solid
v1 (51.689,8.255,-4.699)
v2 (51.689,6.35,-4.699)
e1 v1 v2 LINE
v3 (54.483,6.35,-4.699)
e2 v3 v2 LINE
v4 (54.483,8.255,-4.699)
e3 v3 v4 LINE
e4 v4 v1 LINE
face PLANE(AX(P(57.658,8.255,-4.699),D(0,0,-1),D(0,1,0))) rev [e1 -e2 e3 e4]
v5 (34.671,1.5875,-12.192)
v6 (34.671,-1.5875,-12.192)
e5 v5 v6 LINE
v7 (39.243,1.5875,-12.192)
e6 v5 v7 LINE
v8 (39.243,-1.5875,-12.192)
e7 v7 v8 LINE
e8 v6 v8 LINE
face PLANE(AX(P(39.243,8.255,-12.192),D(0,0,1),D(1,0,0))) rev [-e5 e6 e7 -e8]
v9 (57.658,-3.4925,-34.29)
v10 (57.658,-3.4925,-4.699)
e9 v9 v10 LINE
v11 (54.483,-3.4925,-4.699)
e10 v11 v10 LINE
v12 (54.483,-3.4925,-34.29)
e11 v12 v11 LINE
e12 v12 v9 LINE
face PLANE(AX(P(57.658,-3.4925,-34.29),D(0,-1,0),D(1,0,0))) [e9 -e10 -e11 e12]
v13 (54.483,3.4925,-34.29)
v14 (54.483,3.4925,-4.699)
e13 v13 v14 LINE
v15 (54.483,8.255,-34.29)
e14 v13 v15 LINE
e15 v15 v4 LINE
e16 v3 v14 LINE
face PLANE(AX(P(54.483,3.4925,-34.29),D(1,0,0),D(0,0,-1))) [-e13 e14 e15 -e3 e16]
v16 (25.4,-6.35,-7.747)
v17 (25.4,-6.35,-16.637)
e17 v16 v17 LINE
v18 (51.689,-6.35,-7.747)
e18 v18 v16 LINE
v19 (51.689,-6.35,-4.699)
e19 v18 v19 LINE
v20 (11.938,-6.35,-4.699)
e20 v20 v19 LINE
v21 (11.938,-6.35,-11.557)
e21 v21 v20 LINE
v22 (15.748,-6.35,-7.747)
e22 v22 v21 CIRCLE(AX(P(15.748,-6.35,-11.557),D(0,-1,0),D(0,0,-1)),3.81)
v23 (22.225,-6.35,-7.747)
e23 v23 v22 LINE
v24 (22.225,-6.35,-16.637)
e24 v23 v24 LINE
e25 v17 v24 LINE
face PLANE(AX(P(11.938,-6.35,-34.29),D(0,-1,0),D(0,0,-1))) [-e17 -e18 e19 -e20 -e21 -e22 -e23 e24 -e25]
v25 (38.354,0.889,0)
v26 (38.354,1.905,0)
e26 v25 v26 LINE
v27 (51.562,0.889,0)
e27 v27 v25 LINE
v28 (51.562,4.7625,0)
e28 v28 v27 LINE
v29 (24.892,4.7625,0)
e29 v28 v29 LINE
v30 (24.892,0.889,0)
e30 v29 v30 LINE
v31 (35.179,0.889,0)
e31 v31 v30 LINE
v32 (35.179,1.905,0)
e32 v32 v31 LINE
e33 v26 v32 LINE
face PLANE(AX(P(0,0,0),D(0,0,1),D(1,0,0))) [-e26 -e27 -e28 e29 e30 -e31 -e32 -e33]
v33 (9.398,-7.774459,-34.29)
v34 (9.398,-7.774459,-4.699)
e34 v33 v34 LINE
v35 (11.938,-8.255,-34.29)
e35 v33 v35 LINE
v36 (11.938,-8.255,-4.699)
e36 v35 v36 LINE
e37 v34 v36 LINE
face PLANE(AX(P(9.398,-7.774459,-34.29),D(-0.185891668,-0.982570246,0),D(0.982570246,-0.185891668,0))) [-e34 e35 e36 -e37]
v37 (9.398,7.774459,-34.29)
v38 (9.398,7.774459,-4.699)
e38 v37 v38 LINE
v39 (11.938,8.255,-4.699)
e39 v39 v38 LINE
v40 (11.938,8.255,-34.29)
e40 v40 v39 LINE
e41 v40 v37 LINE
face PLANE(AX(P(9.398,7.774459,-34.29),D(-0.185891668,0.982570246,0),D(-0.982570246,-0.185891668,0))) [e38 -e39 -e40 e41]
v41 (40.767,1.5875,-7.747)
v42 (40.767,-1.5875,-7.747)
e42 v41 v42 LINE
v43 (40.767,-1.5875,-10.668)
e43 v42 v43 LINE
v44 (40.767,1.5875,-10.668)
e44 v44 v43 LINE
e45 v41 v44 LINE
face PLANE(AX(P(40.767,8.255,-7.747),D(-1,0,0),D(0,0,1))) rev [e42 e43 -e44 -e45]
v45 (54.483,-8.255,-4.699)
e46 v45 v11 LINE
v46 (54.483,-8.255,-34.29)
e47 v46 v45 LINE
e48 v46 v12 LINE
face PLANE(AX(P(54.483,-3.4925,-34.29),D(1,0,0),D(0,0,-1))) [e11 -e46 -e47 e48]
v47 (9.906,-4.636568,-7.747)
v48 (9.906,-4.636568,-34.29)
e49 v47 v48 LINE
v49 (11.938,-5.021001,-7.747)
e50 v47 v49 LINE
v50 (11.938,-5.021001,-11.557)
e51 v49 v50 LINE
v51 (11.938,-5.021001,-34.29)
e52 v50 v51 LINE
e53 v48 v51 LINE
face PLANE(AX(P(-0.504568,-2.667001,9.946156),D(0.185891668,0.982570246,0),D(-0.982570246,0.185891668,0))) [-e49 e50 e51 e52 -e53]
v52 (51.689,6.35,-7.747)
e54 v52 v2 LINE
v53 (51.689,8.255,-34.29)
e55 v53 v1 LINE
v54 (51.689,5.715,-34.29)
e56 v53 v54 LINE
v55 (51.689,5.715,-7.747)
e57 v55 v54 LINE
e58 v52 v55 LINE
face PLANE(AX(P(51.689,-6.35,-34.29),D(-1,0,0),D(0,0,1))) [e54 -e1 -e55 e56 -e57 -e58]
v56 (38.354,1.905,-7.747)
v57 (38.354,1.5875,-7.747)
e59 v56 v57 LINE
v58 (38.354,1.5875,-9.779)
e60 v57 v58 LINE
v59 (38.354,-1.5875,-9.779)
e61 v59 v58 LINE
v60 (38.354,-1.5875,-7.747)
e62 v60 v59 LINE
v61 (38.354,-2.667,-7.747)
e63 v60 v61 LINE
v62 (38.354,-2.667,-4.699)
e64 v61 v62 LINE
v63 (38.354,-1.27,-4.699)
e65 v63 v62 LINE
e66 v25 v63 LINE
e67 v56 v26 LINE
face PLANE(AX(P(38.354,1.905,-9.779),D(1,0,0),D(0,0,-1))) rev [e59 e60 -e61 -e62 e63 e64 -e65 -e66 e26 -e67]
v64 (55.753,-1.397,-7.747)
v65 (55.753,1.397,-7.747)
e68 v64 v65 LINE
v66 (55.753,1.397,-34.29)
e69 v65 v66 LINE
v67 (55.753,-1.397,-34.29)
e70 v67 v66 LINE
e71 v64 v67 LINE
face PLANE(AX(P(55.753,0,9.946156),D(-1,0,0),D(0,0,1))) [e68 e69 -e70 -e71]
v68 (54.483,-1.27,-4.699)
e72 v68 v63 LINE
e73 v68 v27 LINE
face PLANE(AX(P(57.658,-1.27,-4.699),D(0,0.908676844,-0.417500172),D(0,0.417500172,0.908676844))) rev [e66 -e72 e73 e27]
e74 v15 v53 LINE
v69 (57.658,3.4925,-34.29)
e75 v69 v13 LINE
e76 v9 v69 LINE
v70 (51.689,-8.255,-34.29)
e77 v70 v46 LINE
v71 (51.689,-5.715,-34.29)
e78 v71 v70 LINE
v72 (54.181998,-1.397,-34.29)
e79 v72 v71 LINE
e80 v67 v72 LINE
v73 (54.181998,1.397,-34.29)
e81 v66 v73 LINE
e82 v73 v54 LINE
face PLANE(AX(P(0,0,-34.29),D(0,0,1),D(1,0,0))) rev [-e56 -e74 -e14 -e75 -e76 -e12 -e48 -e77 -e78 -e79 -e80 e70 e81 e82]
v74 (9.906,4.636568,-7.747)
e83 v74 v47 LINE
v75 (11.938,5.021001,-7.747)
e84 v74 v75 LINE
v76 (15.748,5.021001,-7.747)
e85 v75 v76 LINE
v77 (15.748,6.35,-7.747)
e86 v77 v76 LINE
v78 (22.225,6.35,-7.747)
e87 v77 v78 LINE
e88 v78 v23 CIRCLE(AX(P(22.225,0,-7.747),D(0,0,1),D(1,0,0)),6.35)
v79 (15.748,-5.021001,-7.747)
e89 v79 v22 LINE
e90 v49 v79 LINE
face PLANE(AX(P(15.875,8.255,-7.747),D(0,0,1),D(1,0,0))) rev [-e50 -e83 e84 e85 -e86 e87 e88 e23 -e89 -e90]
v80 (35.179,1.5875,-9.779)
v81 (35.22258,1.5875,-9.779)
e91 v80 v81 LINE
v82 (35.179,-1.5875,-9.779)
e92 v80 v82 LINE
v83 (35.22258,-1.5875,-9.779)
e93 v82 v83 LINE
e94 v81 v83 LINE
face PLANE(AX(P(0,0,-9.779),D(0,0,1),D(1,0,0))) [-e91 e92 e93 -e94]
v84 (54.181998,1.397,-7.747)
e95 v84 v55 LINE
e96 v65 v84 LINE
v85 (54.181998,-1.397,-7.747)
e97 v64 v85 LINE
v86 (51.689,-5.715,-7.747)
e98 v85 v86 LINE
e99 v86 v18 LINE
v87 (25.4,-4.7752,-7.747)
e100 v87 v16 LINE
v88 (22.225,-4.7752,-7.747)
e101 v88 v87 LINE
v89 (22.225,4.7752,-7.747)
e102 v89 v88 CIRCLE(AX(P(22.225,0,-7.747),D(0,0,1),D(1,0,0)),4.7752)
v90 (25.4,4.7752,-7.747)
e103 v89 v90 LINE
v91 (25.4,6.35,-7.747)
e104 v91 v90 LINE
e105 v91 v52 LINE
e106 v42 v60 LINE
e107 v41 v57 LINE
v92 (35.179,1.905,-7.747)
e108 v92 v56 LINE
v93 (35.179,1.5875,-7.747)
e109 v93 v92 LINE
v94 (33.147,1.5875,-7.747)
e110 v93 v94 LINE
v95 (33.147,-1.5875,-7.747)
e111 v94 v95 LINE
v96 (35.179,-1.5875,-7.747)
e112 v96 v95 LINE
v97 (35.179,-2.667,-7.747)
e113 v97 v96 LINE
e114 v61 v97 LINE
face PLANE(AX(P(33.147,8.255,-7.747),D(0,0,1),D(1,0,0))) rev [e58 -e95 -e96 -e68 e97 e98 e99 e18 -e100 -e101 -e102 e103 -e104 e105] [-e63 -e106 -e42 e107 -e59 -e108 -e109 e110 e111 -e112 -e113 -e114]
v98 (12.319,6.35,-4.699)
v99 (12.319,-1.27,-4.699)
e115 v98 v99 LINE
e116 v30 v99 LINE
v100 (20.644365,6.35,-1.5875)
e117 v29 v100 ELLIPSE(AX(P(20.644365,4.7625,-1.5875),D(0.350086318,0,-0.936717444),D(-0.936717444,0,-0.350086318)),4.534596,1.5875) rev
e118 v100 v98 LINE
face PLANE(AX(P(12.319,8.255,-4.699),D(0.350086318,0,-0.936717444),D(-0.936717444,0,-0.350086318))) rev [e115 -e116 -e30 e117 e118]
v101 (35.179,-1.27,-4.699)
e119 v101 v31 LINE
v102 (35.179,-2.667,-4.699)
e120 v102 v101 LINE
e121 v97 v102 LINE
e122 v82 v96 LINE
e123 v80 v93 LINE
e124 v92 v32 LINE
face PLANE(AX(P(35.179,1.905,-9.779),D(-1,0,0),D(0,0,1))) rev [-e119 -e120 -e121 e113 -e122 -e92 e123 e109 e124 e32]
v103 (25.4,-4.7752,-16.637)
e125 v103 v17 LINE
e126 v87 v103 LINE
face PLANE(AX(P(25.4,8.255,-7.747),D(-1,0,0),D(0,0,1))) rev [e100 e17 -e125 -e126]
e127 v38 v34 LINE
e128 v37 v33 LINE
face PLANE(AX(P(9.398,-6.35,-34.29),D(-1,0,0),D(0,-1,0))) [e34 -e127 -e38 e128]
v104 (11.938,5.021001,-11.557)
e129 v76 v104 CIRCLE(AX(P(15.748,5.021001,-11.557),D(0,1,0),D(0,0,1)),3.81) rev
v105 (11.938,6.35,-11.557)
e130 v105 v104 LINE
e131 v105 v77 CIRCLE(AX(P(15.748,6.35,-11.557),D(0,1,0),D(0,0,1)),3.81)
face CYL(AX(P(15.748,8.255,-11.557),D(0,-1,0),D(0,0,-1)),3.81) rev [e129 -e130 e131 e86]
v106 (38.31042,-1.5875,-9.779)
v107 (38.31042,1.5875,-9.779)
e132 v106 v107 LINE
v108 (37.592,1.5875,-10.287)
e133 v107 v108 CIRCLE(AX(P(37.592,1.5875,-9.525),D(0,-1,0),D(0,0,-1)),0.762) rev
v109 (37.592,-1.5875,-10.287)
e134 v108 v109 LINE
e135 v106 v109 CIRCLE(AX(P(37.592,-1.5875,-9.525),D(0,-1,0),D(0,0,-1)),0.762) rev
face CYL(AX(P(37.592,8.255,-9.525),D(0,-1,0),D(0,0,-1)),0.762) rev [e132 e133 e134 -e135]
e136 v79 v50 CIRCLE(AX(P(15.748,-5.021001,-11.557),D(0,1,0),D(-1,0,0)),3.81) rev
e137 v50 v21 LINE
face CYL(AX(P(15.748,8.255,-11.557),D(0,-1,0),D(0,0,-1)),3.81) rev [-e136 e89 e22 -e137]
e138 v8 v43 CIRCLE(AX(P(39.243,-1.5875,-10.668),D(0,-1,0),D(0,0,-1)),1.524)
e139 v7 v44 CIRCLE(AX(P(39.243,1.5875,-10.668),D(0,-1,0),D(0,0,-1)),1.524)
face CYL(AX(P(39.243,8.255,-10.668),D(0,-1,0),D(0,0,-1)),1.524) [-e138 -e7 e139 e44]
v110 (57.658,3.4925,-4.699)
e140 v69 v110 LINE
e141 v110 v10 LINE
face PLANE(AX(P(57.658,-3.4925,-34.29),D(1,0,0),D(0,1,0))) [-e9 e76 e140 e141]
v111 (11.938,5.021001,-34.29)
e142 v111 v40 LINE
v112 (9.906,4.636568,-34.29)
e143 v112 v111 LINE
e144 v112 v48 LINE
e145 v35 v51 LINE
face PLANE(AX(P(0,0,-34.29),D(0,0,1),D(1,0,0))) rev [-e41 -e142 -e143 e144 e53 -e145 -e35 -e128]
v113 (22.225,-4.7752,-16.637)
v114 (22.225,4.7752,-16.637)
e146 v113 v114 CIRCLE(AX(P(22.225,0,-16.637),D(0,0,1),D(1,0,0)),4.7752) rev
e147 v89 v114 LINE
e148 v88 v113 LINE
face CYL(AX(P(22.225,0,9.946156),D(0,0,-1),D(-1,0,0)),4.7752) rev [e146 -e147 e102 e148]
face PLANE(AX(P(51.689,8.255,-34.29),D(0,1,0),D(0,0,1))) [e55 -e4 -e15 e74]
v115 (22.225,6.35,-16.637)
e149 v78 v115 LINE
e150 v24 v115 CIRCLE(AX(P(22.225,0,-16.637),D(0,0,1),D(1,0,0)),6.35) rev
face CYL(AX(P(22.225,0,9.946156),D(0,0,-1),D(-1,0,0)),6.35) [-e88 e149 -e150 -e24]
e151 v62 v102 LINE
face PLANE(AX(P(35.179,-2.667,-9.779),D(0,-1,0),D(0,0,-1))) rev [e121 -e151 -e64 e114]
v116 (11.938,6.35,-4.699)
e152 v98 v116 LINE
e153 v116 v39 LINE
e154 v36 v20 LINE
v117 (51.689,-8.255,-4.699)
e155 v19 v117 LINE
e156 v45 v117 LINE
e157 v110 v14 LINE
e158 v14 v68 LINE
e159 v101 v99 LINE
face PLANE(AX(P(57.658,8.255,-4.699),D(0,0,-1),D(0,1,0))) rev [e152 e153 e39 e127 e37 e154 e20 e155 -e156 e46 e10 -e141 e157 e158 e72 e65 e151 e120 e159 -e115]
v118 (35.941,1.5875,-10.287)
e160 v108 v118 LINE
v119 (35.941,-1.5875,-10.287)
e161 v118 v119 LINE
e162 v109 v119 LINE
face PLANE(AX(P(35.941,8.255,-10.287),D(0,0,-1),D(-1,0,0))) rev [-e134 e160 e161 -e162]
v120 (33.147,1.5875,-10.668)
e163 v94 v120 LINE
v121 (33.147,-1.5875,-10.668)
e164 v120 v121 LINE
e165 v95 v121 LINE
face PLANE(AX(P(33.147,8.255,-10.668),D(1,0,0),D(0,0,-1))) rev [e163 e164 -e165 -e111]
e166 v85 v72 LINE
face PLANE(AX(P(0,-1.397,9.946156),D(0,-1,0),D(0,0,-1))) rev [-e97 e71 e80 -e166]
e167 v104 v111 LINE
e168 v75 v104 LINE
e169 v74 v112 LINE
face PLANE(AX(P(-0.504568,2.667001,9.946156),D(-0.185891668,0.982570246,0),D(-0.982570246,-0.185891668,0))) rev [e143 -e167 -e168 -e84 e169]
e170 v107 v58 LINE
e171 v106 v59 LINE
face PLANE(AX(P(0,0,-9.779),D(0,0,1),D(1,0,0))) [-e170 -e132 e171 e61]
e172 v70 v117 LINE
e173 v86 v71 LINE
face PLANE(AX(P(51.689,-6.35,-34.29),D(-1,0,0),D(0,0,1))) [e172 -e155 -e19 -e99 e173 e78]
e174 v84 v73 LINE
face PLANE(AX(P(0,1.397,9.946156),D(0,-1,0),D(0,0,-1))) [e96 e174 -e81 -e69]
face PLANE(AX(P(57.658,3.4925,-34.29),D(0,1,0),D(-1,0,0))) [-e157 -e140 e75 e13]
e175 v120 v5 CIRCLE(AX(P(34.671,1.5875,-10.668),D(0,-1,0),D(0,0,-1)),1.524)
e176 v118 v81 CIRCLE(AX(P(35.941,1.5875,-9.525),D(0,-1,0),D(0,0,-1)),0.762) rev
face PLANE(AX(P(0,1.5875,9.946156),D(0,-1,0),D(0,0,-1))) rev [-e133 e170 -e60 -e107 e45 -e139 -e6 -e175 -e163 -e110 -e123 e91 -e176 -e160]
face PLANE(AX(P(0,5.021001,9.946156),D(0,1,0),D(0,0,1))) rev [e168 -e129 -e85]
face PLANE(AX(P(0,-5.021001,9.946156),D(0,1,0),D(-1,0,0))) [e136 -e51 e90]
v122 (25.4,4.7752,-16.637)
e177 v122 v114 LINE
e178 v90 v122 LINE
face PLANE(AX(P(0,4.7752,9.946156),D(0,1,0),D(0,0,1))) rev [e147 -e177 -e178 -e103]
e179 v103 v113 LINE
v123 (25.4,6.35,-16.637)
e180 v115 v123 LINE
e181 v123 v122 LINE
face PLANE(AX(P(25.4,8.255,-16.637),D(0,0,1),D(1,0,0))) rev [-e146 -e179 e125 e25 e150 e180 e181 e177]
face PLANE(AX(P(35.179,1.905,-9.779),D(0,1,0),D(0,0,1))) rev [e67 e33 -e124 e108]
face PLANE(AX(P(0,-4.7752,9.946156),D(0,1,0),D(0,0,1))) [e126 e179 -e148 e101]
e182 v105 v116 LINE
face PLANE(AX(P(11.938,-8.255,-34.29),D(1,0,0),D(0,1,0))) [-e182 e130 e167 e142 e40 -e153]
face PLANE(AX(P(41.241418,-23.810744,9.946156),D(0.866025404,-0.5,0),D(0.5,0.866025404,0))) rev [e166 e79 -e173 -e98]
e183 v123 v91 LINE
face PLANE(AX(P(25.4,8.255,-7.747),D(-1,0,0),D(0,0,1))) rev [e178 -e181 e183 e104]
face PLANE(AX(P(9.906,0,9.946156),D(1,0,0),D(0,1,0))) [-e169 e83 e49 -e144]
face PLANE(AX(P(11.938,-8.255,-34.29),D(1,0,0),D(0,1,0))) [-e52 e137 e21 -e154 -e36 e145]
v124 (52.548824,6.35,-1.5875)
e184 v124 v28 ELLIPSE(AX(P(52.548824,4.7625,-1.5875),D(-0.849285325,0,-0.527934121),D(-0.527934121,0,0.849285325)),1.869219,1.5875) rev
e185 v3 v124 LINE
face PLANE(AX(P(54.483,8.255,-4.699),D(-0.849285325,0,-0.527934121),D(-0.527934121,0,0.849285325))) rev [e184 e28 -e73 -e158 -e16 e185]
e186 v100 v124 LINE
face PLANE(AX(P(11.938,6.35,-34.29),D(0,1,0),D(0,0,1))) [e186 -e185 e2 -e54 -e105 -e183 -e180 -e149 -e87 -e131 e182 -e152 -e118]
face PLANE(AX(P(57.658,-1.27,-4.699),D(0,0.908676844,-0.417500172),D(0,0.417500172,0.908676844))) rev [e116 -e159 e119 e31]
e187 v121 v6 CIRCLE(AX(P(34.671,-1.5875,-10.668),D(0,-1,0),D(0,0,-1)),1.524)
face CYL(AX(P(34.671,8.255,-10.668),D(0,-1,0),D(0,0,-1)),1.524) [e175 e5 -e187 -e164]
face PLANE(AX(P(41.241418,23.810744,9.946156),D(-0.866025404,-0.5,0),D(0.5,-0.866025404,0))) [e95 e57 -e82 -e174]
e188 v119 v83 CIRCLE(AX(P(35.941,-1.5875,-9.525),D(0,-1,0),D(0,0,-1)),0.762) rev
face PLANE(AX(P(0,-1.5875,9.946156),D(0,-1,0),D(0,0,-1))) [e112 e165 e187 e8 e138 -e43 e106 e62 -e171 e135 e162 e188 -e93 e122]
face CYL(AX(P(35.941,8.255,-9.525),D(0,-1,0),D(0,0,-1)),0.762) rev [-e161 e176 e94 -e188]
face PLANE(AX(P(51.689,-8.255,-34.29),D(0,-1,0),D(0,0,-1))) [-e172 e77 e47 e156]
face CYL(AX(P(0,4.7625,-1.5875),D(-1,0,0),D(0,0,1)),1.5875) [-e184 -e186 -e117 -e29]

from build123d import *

# Parameters (mm, degrees)
BOSS_EXTRUDE1_DEPTH    = 34.29
SKETCH2_W              = 4.699
SKETCH2_H              = 1.905
CUT_EXTRUDE1_DEPTH     = 60.774381845
SKETCH3_W              = 3.175
SKETCH3_H              = 4.572
CUT_EXTRUDE2_DEPTH     = 9.779
CUT_EXTRUDE3_DEPTH     = 70.085665402
CUT_EXTRUDE4_START     = -26.543
CUT_EXTRUDE4_OUTLINE_W = 7.62
CUT_EXTRUDE4_OUTLINE_H = 4.7625
CUT_EXTRUDE4_DEPTH     = 26.543
FILLET4_R              = 1.5875


# Read off the part's stored shape, not the designer's step: Cut-Extrude4
with BuildPart() as part:
    # Sketch1 → Boss-Extrude1 (new body)
    with BuildSketch(Plane.XY):
        Polygon((9.398, 6.35), (9.398, -6.35), (9.398, -7.774459459), (11.938, -8.255), (11.938, -6.35), (51.689, -6.35), (51.689, -8.255), (54.483, -8.255), (54.483, -3.4925), (57.658, -3.4925), (57.658, 3.4925), (54.483, 3.4925), (54.483, 8.255), (51.689, 8.255), (51.689, 6.35), (11.938, 6.35), (11.938, 8.255), (9.398, 7.774459459), align=None)
    extrude(amount=-BOSS_EXTRUDE1_DEPTH)

    # Sketch2 → Cut-Extrude1 (cut, through all)
    with BuildSketch(Plane.ZY.offset(-9.398)):
        with Locations((-2.3495, 7.3025)):
            Rectangle(SKETCH2_W, SKETCH2_H)
        Polygon((-4.699, -8.255), (-4.699, -1.27), (0, 0.889), (0, -8.255), align=None)
    extrude(amount=-CUT_EXTRUDE1_DEPTH, mode=Mode.SUBTRACT)

    # Sketch3 → Cut-Extrude2 (cut)
    with BuildSketch(Plane.XY):
        with Locations((36.7665, -0.381)):
            Rectangle(SKETCH3_W, SKETCH3_H)
    extrude(amount=-CUT_EXTRUDE2_DEPTH, mode=Mode.SUBTRACT)

    # Sketch4 → Cut-Extrude3 (cut, through all)
    with BuildSketch(Plane.XZ.offset(8.255)):
        with BuildLine():
            Line((51.689, -34.29), (51.689, -7.747))
            Line((51.689, -7.747), (40.767, -7.747))
            Line((40.767, -7.747), (40.767, -10.668))
            ThreePointArc((40.767, -10.668), (40.320630735, -11.745630735), (39.243, -12.192))
            Line((39.243, -12.192), (34.671, -12.192))
            ThreePointArc((34.671, -12.192), (33.593369265, -11.745630735), (33.147, -10.668))
            Line((33.147, -10.668), (33.147, -7.747))
            Line((33.147, -7.747), (25.4, -7.747))
            Line((25.4, -7.747), (25.4, -16.637))
            Line((25.4, -16.637), (15.875, -16.637))
            Line((15.875, -16.637), (15.875, -7.747))
            Line((15.875, -7.747), (15.748, -7.747))
            ThreePointArc((15.748, -7.747), (13.053923164, -8.862923164), (11.938, -11.557))
            Line((11.938, -11.557), (11.938, -34.29))
            Line((11.938, -34.29), (51.689, -34.29))
        make_face()
        with BuildLine():
            Line((35.179, -7.747), (38.354, -7.747))
            Line((38.354, -7.747), (38.354, -9.525))
            ThreePointArc((38.354, -9.525), (38.130815367, -10.063815367), (37.592, -10.287))
            Line((37.592, -10.287), (35.941, -10.287))
            ThreePointArc((35.941, -10.287), (35.402184633, -10.063815367), (35.179, -9.525))
            Line((35.179, -9.525), (35.179, -7.747))
        make_face()
        Polygon((57.658, -4.699), (54.483, -4.699), (51.562, 0), (57.658, 0), align=None)
        Polygon((6.604, -4.699), (12.319, -4.699), (24.892, 0), (6.604, 0), align=None)
    extrude(amount=-CUT_EXTRUDE3_DEPTH, mode=Mode.SUBTRACT)

    # Cut-Extrude4 outline → Cut-Extrude4 (cut)
    with BuildSketch(Plane(origin=(0, 0, -34.29), x_dir=(-1, 0, 0), z_dir=(0, 0, -1)).offset(CUT_EXTRUDE4_START)):
        with BuildLine():
            Line((-22.225, -6.35), (-15.875, -6.35))
            Line((-15.875, -6.35), (-15.875, -5.021000706))
            Line((-15.875, -5.021000706), (-11.938, -5.021000706))
            Line((-11.938, -5.021000706), (-9.906, -4.636568273))
            Line((-9.906, -4.636568273), (-9.906, 4.636568273))
            Line((-9.906, 4.636568273), (-11.938, 5.021000706))
            Line((-11.938, 5.021000706), (-15.875, 5.021000706))
            Line((-15.875, 5.021000706), (-15.875, 6.35))
            Line((-15.875, 6.35), (-22.225, 6.35))
            ThreePointArc((-22.225, 6.35), (-15.875, 0), (-22.225, -6.35))
        make_face()
        with Locations((-36.957, -3.96875)):
            Rectangle(CUT_EXTRUDE4_OUTLINE_W, CUT_EXTRUDE4_OUTLINE_H)
        with BuildLine():
            Line((-25.4, 4.7752), (-25.4, -4.7752))
            Line((-25.4, -4.7752), (-22.225, -4.7752))
            ThreePointArc((-22.225, -4.7752), (-17.4498, 0), (-22.225, 4.7752))
            Line((-22.225, 4.7752), (-25.4, 4.7752))
        make_face()
        with Locations((-36.957, 3.96875)):
            Rectangle(CUT_EXTRUDE4_OUTLINE_W, CUT_EXTRUDE4_OUTLINE_H)
        Polygon((-54.181998462, -1.397), (-51.689, -5.715), (-51.689, 5.715), (-54.181998462, 1.397), (-55.753, 1.397), (-55.753, -1.397), align=None)
    extrude(amount=CUT_EXTRUDE4_DEPTH, mode=Mode.SUBTRACT)

    # Fillet4
    fillet4_edges = [part.edges().sort_by_distance(p)[0] for p in [
        (38.227, 6.35, 0),
    ]]
    fillet(fillet4_edges, radius=FILLET4_R)


solid = part.part
